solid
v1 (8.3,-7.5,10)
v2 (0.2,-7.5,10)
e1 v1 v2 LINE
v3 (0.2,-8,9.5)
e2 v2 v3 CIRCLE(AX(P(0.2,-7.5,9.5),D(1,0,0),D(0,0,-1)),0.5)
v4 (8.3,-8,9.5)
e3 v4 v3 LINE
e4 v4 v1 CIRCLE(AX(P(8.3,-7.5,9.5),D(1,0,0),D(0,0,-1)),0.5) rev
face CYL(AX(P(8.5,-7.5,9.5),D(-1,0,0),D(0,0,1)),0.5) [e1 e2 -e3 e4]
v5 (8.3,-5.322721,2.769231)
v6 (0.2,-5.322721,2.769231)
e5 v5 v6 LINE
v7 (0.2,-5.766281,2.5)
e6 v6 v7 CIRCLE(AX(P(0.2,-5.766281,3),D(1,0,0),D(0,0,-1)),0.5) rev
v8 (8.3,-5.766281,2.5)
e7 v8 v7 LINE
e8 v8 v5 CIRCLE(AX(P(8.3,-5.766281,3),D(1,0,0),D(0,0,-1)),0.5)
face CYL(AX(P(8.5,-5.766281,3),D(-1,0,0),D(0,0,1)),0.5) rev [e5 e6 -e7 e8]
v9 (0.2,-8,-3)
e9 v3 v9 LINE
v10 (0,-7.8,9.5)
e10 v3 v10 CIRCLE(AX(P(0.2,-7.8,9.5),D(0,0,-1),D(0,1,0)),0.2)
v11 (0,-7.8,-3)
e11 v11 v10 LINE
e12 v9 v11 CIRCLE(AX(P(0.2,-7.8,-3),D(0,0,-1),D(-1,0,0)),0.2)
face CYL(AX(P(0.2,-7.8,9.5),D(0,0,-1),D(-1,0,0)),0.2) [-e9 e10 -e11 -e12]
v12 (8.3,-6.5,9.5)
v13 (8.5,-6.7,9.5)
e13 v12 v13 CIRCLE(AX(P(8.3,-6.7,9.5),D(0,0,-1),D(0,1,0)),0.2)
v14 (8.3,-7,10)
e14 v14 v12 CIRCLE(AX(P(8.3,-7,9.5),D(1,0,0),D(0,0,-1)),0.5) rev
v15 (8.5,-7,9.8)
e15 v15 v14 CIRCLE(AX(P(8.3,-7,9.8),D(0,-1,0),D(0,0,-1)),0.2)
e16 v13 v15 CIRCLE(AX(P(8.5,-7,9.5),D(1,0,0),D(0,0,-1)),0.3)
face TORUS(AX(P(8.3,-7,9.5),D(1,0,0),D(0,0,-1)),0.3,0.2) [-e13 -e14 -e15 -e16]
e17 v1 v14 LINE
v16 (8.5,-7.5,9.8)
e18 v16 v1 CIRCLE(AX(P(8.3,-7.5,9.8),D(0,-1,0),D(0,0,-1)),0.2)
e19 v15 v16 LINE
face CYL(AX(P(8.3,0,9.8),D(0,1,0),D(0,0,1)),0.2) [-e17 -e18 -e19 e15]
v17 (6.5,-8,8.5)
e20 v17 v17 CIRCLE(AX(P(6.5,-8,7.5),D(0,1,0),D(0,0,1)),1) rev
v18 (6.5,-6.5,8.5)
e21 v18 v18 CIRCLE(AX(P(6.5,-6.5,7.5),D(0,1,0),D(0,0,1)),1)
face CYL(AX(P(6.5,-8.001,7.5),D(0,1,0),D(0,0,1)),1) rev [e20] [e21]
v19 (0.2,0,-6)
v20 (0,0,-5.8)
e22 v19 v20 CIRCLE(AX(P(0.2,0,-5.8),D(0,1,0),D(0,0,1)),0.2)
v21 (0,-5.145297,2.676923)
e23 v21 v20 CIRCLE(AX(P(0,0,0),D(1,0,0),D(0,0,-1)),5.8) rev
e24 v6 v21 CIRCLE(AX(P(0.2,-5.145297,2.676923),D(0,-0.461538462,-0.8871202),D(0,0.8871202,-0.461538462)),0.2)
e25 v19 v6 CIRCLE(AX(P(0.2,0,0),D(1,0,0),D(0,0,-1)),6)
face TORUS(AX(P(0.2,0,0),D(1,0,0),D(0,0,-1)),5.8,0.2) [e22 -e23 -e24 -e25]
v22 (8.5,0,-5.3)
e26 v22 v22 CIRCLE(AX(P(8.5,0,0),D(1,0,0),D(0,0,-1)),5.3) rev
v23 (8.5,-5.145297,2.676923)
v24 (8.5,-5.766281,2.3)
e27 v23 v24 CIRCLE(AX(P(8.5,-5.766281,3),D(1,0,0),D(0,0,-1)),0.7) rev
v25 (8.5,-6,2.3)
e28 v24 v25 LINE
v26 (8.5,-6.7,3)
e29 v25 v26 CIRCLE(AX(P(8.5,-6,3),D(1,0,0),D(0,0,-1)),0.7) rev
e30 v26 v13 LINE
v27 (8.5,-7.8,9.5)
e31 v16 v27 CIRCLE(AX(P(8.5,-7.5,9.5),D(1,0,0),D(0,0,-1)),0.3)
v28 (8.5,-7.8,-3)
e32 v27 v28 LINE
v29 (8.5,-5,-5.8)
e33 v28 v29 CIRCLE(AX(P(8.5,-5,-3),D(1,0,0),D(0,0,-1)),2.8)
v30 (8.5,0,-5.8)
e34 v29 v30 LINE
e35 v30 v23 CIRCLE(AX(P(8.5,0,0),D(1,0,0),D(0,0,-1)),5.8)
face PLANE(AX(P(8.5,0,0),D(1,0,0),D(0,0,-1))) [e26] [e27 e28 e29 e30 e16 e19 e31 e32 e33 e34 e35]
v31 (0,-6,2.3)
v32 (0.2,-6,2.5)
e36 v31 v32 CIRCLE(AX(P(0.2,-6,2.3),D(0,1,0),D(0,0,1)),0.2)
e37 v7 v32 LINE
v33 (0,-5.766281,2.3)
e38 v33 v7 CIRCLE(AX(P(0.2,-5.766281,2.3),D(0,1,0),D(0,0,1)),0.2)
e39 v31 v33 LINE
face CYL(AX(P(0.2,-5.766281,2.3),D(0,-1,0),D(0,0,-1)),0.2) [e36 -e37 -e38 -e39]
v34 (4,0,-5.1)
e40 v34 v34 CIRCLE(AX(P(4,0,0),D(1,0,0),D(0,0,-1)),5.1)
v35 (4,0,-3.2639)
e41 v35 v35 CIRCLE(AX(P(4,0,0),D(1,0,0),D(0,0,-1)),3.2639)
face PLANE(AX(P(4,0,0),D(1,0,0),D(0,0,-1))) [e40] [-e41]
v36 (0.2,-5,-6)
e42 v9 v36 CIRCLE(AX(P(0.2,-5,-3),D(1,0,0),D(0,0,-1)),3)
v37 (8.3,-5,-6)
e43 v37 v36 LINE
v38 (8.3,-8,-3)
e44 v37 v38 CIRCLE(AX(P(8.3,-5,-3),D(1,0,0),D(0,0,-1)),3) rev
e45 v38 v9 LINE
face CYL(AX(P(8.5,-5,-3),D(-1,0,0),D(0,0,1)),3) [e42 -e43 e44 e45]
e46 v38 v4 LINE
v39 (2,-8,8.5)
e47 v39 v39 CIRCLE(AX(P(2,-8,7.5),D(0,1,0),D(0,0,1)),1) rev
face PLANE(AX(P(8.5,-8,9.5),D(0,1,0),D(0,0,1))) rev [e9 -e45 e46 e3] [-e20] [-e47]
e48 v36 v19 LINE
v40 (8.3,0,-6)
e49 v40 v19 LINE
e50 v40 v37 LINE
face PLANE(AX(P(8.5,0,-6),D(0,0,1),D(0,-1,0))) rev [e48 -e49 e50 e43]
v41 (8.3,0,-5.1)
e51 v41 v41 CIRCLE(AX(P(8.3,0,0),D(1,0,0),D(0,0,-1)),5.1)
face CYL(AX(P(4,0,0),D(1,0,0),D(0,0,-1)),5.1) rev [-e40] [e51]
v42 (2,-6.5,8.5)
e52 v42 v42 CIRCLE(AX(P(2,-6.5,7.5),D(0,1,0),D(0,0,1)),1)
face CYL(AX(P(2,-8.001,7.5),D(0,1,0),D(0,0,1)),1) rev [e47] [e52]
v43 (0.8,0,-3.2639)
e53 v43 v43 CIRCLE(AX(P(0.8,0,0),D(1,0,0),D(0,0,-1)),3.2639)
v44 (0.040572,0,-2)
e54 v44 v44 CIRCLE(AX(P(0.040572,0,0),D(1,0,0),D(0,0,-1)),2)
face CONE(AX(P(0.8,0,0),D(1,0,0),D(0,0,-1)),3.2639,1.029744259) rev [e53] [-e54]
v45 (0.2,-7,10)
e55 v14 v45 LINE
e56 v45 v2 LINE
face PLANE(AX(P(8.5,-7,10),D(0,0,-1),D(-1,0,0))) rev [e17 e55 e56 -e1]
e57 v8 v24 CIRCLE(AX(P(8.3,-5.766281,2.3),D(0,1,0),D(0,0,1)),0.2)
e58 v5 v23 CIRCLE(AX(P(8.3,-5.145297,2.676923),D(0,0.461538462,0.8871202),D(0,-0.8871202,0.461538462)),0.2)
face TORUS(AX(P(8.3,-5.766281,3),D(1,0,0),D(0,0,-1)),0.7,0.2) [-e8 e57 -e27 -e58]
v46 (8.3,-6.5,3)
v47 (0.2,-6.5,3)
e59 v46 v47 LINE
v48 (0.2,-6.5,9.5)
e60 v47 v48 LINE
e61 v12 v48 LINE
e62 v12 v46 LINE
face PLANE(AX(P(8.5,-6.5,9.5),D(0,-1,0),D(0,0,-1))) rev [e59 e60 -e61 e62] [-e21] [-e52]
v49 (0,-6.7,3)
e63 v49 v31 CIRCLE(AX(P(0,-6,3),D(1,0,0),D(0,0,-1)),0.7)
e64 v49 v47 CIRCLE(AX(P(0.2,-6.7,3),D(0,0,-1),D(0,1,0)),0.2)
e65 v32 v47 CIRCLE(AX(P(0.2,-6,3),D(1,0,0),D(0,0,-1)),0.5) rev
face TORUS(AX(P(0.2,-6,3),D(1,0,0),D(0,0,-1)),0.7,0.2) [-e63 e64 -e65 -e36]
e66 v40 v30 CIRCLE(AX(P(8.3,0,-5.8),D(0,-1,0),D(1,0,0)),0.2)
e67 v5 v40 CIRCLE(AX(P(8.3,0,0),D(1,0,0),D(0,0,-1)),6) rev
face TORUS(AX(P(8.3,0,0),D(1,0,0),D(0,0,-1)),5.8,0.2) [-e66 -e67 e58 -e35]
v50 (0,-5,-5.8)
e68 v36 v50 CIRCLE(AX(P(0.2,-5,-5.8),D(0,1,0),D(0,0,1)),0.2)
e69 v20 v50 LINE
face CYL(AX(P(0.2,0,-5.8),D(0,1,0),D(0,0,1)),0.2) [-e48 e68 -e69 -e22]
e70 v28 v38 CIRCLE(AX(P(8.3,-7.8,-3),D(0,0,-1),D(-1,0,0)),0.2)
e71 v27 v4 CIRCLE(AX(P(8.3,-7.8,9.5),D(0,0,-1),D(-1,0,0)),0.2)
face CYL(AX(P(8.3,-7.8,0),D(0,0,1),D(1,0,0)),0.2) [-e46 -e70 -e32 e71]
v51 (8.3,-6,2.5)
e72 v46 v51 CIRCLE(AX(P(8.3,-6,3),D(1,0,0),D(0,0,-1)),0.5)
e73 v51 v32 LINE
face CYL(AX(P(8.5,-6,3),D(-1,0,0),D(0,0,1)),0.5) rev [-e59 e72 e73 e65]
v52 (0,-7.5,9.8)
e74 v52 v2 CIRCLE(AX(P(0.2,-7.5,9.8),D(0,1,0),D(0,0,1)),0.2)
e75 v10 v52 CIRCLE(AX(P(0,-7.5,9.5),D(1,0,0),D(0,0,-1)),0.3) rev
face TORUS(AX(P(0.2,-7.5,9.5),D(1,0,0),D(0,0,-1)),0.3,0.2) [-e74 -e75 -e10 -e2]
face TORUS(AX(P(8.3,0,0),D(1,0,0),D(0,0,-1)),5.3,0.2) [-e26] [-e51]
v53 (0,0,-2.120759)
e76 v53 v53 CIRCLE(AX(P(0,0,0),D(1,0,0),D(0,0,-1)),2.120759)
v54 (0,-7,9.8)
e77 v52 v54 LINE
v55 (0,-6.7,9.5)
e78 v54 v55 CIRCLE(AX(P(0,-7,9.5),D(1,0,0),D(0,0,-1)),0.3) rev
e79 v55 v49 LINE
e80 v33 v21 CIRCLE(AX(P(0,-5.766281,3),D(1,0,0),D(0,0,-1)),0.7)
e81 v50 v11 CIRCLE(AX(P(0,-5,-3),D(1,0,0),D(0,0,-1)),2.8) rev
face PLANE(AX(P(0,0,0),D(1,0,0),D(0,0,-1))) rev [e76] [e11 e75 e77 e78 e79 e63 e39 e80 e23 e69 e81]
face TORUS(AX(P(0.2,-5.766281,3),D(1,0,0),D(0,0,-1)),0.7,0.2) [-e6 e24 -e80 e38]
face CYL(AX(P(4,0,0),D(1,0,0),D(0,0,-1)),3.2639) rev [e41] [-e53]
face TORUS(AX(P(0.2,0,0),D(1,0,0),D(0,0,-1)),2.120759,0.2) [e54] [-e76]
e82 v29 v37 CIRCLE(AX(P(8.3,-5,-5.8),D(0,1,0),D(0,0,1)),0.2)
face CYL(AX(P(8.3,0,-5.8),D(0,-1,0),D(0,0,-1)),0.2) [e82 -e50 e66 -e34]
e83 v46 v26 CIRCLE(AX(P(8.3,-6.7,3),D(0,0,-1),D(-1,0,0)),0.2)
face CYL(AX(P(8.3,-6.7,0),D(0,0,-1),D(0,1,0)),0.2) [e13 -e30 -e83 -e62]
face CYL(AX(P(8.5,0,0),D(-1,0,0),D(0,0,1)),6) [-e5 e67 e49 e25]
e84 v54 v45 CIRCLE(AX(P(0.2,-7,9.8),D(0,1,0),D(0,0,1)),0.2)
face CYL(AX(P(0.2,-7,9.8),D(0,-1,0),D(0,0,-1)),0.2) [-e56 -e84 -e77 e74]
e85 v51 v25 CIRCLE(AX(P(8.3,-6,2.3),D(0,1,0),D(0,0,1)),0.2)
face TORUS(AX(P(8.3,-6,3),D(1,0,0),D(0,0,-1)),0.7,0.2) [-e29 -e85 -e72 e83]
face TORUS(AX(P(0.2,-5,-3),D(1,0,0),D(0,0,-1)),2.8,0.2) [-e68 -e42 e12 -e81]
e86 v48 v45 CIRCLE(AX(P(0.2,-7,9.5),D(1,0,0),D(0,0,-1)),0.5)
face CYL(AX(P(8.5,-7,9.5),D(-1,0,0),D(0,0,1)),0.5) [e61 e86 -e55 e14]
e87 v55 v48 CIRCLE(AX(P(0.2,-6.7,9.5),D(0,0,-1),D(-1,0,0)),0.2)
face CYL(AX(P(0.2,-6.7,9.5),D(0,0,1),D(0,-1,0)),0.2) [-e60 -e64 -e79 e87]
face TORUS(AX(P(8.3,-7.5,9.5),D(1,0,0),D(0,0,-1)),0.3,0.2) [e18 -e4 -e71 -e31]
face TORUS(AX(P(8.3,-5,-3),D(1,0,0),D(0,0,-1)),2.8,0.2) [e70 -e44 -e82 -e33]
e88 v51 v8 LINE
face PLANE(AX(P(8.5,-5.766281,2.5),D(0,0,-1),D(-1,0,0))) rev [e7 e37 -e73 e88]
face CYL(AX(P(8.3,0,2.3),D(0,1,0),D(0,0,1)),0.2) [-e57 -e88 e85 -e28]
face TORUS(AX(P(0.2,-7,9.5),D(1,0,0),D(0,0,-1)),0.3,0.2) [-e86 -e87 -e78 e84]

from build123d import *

# Parameters (mm, degrees)
EXTRUDE_1_DEPTH             = 8.5
SKETCH_2_R                  = 2
CUT_EXTRUDE_1_DEPTH         = 10
SKETCH_6_R                  = 5.1
CUT_EXTRUDE_3_DEPTH         = 4.5
HOLE_WIZARD_5_16_18_1_D     = 6.5278
HOLE_WIZARD_5_16_18_1_DEPTH = 3.2
HOLE_WIZARD_5_16_18_1_TIP   = 1.961148974
CUT_EXTRUDE_2_REACH         = 20.125
SKETCH_5_R                  = 1
FILLET_1_R                  = 0.2


with BuildPart() as part:
    # 草图1 → 凸台-拉伸1 (new body)
    with BuildSketch(Plane(origin=(0, 0, 0), x_dir=(0, 0, -1), z_dir=(1, 0, 0))):
        with BuildLine():
            Line((-9.5, -6.5), (-3, -6.5))
            ThreePointArc((-3, -6.5), (-2.646446609, -6.353553391), (-2.5, -6))
            Line((-2.5, -6), (-2.5, -5.766281297))
            ThreePointArc((-2.5, -5.766281297), (-2.572574793, -5.506844037), (-2.769230769, -5.322721198))
            ThreePointArc((-2.769230769, -5.322721198), (-3.11324713, 5.129102486), (6, 0))
            Line((6, 0), (6, -5))
            ThreePointArc((6, -5), (5.121320344, -7.121320344), (3, -8))
            Line((3, -8), (-9.5, -8))
            ThreePointArc((-9.5, -8), (-9.853553391, -7.853553391), (-10, -7.5))
            Line((-10, -7.5), (-10, -7))
            ThreePointArc((-10, -7), (-9.853553391, -6.646446609), (-9.5, -6.5))
        make_face()
    extrude(amount=EXTRUDE_1_DEPTH)

    # 草图2 → 切除-拉伸1 (cut)
    with BuildSketch(Plane.ZY):
        Circle(SKETCH_2_R)
    extrude(amount=-CUT_EXTRUDE_1_DEPTH, mode=Mode.SUBTRACT)

    # 草图6 → 切除-拉伸3 (cut)
    with BuildSketch(Plane(origin=(8.5, 0, 0), x_dir=(0, 0, -1), z_dir=(1, 0, 0))):
        Circle(SKETCH_6_R)
    extrude(amount=-CUT_EXTRUDE_3_DEPTH, mode=Mode.SUBTRACT)

    # 5/16-18 螺纹孔1
    with Locations(Plane(origin=(4, 0, 0), x_dir=(0, 0, -1), z_dir=(1, 0, 0))):
        with Locations((0, 0)):
            Hole(HOLE_WIZARD_5_16_18_1_D / 2, depth=HOLE_WIZARD_5_16_18_1_DEPTH)
            with Locations((0, 0, -(HOLE_WIZARD_5_16_18_1_DEPTH + HOLE_WIZARD_5_16_18_1_TIP / 2))):  # 118° drill point
                Cone(0, HOLE_WIZARD_5_16_18_1_D / 2, HOLE_WIZARD_5_16_18_1_TIP, mode=Mode.SUBTRACT)

    # 草图5 → 切除-拉伸2 (cut, up to next)
    with BuildSketch(Plane(origin=(0, -6.5, 0), x_dir=(1, 0, 0), z_dir=(0, 1, 0)), mode=Mode.PRIVATE) as cut_extrude_2_sk1:
        with Locations(Location((2, -7.5, 0), (0, 0, 270))):
            Circle(SKETCH_5_R)
    cut_extrude_2_tool1 = extrude(cut_extrude_2_sk1.sketch, amount=-CUT_EXTRUDE_2_REACH, mode=Mode.PRIVATE) & part.part
    # 草图5 → 切除-拉伸2 (cut, up to next)
    with BuildSketch(Plane(origin=(0, -6.5, 0), x_dir=(1, 0, 0), z_dir=(0, 1, 0)), mode=Mode.PRIVATE) as cut_extrude_2_sk2:
        with Locations(Location((6.5, -7.5, 0), (0, 0, 270))):
            Circle(SKETCH_5_R)
    cut_extrude_2_tool2 = extrude(cut_extrude_2_sk2.sketch, amount=-CUT_EXTRUDE_2_REACH, mode=Mode.PRIVATE) & part.part
    add(cut_extrude_2_tool1.solids().sort_by_distance((2, -6.5, 7.5))[0], mode=Mode.SUBTRACT)
    add(cut_extrude_2_tool2.solids().sort_by_distance((6.5, -6.5, 7.5))[0], mode=Mode.SUBTRACT)

    # 圆角1
    # the kernel refuses this fillet: 0.2 mm, written as the material it takes off along each edge
    with BuildSketch(Plane(origin=(8.5, -6, 2.5), x_dir=(0, 0, -1), z_dir=(0, 1, 0))) as fillet_1_piece_1:
        with BuildLine():
            CenterArc((FILLET_1_R, FILLET_1_R), FILLET_1_R, 180, 90)
            Line((0, FILLET_1_R), (-FILLET_1_R * 0.02, FILLET_1_R))
            Line((-FILLET_1_R * 0.02, FILLET_1_R), (-FILLET_1_R * 0.02, -FILLET_1_R * 0.02))
            Line((-FILLET_1_R * 0.02, -FILLET_1_R * 0.02), (FILLET_1_R, -FILLET_1_R * 0.02))
            Line((FILLET_1_R, -FILLET_1_R * 0.02), (FILLET_1_R, 0))
        make_face()
    extrude(amount=0.233718703, mode=Mode.SUBTRACT)
    with BuildSketch(Plane(origin=(0, 0, -6), x_dir=(0, 0, 1), z_dir=(0, -1, 0))) as fillet_1_piece_2:
        with BuildLine():
            CenterArc((FILLET_1_R, -FILLET_1_R), FILLET_1_R, 90, 90)
            Line((0, -FILLET_1_R), (-FILLET_1_R * 0.02, -FILLET_1_R))
            Line((-FILLET_1_R * 0.02, -FILLET_1_R), (-FILLET_1_R * 0.02, FILLET_1_R * 0.02))
            Line((-FILLET_1_R * 0.02, FILLET_1_R * 0.02), (FILLET_1_R, FILLET_1_R * 0.02))
            Line((FILLET_1_R, FILLET_1_R * 0.02), (FILLET_1_R, 0))
        make_face()
    extrude(amount=5, mode=Mode.SUBTRACT)
    with BuildSketch(Plane(origin=(0, -5, -3), x_dir=(0, 0, -1), z_dir=(0, 1, 0))) as fillet_1_piece_3:
        with BuildLine():
            CenterArc((3 - FILLET_1_R, -FILLET_1_R), FILLET_1_R, 0, 90)
            Line((3 - FILLET_1_R, 0), (3 - FILLET_1_R, FILLET_1_R * 0.02))
            Line((3 - FILLET_1_R, FILLET_1_R * 0.02), (3 + FILLET_1_R * 0.02, FILLET_1_R * 0.02))
            Line((3 + FILLET_1_R * 0.02, FILLET_1_R * 0.02), (3 + FILLET_1_R * 0.02, -FILLET_1_R))
            Line((3 + FILLET_1_R * 0.02, -FILLET_1_R), (3, -FILLET_1_R))
        make_face()
    revolve(axis=Axis((0, -5, -3), (-1, 0, 0)), revolution_arc=90, mode=Mode.SUBTRACT)
    with BuildSketch(Plane(origin=(0, -8, -3), x_dir=(1, 0, 0), z_dir=(0, 0, 1))) as fillet_1_piece_4:
        with BuildLine():
            CenterArc((FILLET_1_R, FILLET_1_R), FILLET_1_R, 180, 90)
            Line((0, FILLET_1_R), (-FILLET_1_R * 0.02, FILLET_1_R))
            Line((-FILLET_1_R * 0.02, FILLET_1_R), (-FILLET_1_R * 0.02, -FILLET_1_R * 0.02))
            Line((-FILLET_1_R * 0.02, -FILLET_1_R * 0.02), (FILLET_1_R, -FILLET_1_R * 0.02))
            Line((FILLET_1_R, -FILLET_1_R * 0.02), (FILLET_1_R, 0))
        make_face()
    extrude(amount=12.5, mode=Mode.SUBTRACT)
    with BuildSketch(Plane(origin=(0, -7.5, 9.5), x_dir=(0, -1, 0), z_dir=(0, 0, -1))) as fillet_1_piece_5:
        with BuildLine():
            CenterArc((0.5 - FILLET_1_R, -FILLET_1_R), FILLET_1_R, 0, 90)
            Line((0.5, -FILLET_1_R), (0.5 + FILLET_1_R * 0.02, -FILLET_1_R))
            Line((0.5 + FILLET_1_R * 0.02, -FILLET_1_R), (0.5 + FILLET_1_R * 0.02, FILLET_1_R * 0.02))
            Line((0.5 + FILLET_1_R * 0.02, FILLET_1_R * 0.02), (0.5 - FILLET_1_R, FILLET_1_R * 0.02))
            Line((0.5 - FILLET_1_R, FILLET_1_R * 0.02), (0.5 - FILLET_1_R, 0))
        make_face()
    revolve(axis=Axis((0, -7.5, 9.5), (-1, 0, 0)), revolution_arc=90, mode=Mode.SUBTRACT)
    with BuildSketch(Plane(origin=(0, -7.5, 10), x_dir=(0, 0, -1), z_dir=(0, 1, 0))) as fillet_1_piece_6:
        with BuildLine():
            CenterArc((FILLET_1_R, -FILLET_1_R), FILLET_1_R, 90, 90)
            Line((0, -FILLET_1_R), (-FILLET_1_R * 0.02, -FILLET_1_R))
            Line((-FILLET_1_R * 0.02, -FILLET_1_R), (-FILLET_1_R * 0.02, FILLET_1_R * 0.02))
            Line((-FILLET_1_R * 0.02, FILLET_1_R * 0.02), (FILLET_1_R, FILLET_1_R * 0.02))
            Line((FILLET_1_R, FILLET_1_R * 0.02), (FILLET_1_R, 0))
        make_face()
    extrude(amount=0.5, mode=Mode.SUBTRACT)
    with BuildSketch(Plane(origin=(0, -7, 9.5), x_dir=(0, 0, 1), z_dir=(0, -1, 0))) as fillet_1_piece_7:
        with BuildLine():
            CenterArc((0.5 - FILLET_1_R, -FILLET_1_R), FILLET_1_R, 0, 90)
            Line((0.5, -FILLET_1_R), (0.5 + FILLET_1_R * 0.02, -FILLET_1_R))
            Line((0.5 + FILLET_1_R * 0.02, -FILLET_1_R), (0.5 + FILLET_1_R * 0.02, FILLET_1_R * 0.02))
            Line((0.5 + FILLET_1_R * 0.02, FILLET_1_R * 0.02), (0.5 - FILLET_1_R, FILLET_1_R * 0.02))
            Line((0.5 - FILLET_1_R, FILLET_1_R * 0.02), (0.5 - FILLET_1_R, 0))
        make_face()
    revolve(axis=Axis((0, -7, 9.5), (-1, 0, 0)), revolution_arc=90, mode=Mode.SUBTRACT)
    with BuildSketch(Plane(origin=(0, -6.5, 9.5), x_dir=(0, -1, 0), z_dir=(0, 0, -1))) as fillet_1_piece_8:
        with BuildLine():
            CenterArc((FILLET_1_R, -FILLET_1_R), FILLET_1_R, 90, 90)
            Line((0, -FILLET_1_R), (-FILLET_1_R * 0.02, -FILLET_1_R))
            Line((-FILLET_1_R * 0.02, -FILLET_1_R), (-FILLET_1_R * 0.02, FILLET_1_R * 0.02))
            Line((-FILLET_1_R * 0.02, FILLET_1_R * 0.02), (FILLET_1_R, FILLET_1_R * 0.02))
            Line((FILLET_1_R, FILLET_1_R * 0.02), (FILLET_1_R, 0))
        make_face()
    extrude(amount=6.5, mode=Mode.SUBTRACT)
    with BuildSketch(Plane(origin=(0, -6, 3), x_dir=(0, -1, 0), z_dir=(0, 0, 1))) as fillet_1_piece_9:
        with BuildLine():
            CenterArc((0.5 + FILLET_1_R, FILLET_1_R), FILLET_1_R, 180, 90)
            Line((0.5, FILLET_1_R), (0.5 - FILLET_1_R * 0.02, FILLET_1_R))
            Line((0.5 - FILLET_1_R * 0.02, FILLET_1_R), (0.5 - FILLET_1_R * 0.02, -FILLET_1_R * 0.02))
            Line((0.5 - FILLET_1_R * 0.02, -FILLET_1_R * 0.02), (0.5 + FILLET_1_R, -FILLET_1_R * 0.02))
            Line((0.5 + FILLET_1_R, -FILLET_1_R * 0.02), (0.5 + FILLET_1_R, 0))
        make_face()
    revolve(axis=Axis((0, -6, 3), (1, 0, 0)), revolution_arc=90, mode=Mode.SUBTRACT)
    with BuildSketch(Plane(origin=(8.5, -6, 3), x_dir=(0, -1, 0), z_dir=(0, 0, 1))) as fillet_1_piece_10:
        with BuildLine():
            CenterArc((0.5 + FILLET_1_R, -FILLET_1_R), FILLET_1_R, 90, 90)
            Line((0.5, -FILLET_1_R), (0.5 - FILLET_1_R * 0.02, -FILLET_1_R))
            Line((0.5 - FILLET_1_R * 0.02, -FILLET_1_R), (0.5 - FILLET_1_R * 0.02, FILLET_1_R * 0.02))
            Line((0.5 - FILLET_1_R * 0.02, FILLET_1_R * 0.02), (0.5 + FILLET_1_R, FILLET_1_R * 0.02))
            Line((0.5 + FILLET_1_R, FILLET_1_R * 0.02), (0.5 + FILLET_1_R, 0))
        make_face()
    revolve(axis=Axis((8.5, -6, 3), (1, 0, 0)), revolution_arc=90, mode=Mode.SUBTRACT)
    with BuildSketch(Plane(origin=(0, -6, 2.5), x_dir=(0, 0, -1), z_dir=(0, 1, 0))) as fillet_1_piece_11:
        with BuildLine():
            CenterArc((FILLET_1_R, -FILLET_1_R), FILLET_1_R, 90, 90)
            Line((0, -FILLET_1_R), (-FILLET_1_R * 0.02, -FILLET_1_R))
            Line((-FILLET_1_R * 0.02, -FILLET_1_R), (-FILLET_1_R * 0.02, FILLET_1_R * 0.02))
            Line((-FILLET_1_R * 0.02, FILLET_1_R * 0.02), (FILLET_1_R, FILLET_1_R * 0.02))
            Line((FILLET_1_R, FILLET_1_R * 0.02), (FILLET_1_R, 0))
        make_face()
    extrude(amount=0.233718703, mode=Mode.SUBTRACT)
    with BuildSketch(Plane(origin=(0, -5.766281297, 3), x_dir=(0, 0, -1), z_dir=(0, -1, 0))) as fillet_1_piece_12:
        with BuildLine():
            CenterArc((0.5 + FILLET_1_R, FILLET_1_R), FILLET_1_R, 180, 90)
            Line((0.5, FILLET_1_R), (0.5 - FILLET_1_R * 0.02, FILLET_1_R))
            Line((0.5 - FILLET_1_R * 0.02, FILLET_1_R), (0.5 - FILLET_1_R * 0.02, -FILLET_1_R * 0.02))
            Line((0.5 - FILLET_1_R * 0.02, -FILLET_1_R * 0.02), (0.5 + FILLET_1_R, -FILLET_1_R * 0.02))
            Line((0.5 + FILLET_1_R, -FILLET_1_R * 0.02), (0.5 + FILLET_1_R, 0))
        make_face()
    revolve(axis=Axis((0, -5.766281297, 3), (1, 0, 0)), revolution_arc=62.51357375, mode=Mode.SUBTRACT)
    with BuildSketch(Plane(origin=(0, 0, 0), x_dir=(0, -0.8871201995900613, 0.46153846153846145), z_dir=(0, -0.46153846153846145, -0.8871201995900613))) as fillet_1_piece_13:
        with BuildLine():
            CenterArc((6 - FILLET_1_R, -FILLET_1_R), FILLET_1_R, 0, 90)
            Line((6, -FILLET_1_R), (6 + FILLET_1_R * 0.02, -FILLET_1_R))
            Line((6 + FILLET_1_R * 0.02, -FILLET_1_R), (6 + FILLET_1_R * 0.02, FILLET_1_R * 0.02))
            Line((6 + FILLET_1_R * 0.02, FILLET_1_R * 0.02), (6 - FILLET_1_R, FILLET_1_R * 0.02))
            Line((6 - FILLET_1_R, FILLET_1_R * 0.02), (6 - FILLET_1_R, 0))
        make_face()
    revolve(axis=Axis((0, 0, 0), (-1, 0, 0)), revolution_arc=242.51357375, mode=Mode.SUBTRACT)
    with BuildSketch(Plane(origin=(8.5, -6.5, 9.5), x_dir=(0, -1, 0), z_dir=(0, 0, -1))) as fillet_1_piece_14:
        with BuildLine():
            CenterArc((FILLET_1_R, FILLET_1_R), FILLET_1_R, 180, 90)
            Line((0, FILLET_1_R), (-FILLET_1_R * 0.02, FILLET_1_R))
            Line((-FILLET_1_R * 0.02, FILLET_1_R), (-FILLET_1_R * 0.02, -FILLET_1_R * 0.02))
            Line((-FILLET_1_R * 0.02, -FILLET_1_R * 0.02), (FILLET_1_R, -FILLET_1_R * 0.02))
            Line((FILLET_1_R, -FILLET_1_R * 0.02), (FILLET_1_R, 0))
        make_face()
    extrude(amount=6.5, mode=Mode.SUBTRACT)
    with BuildSketch(Plane(origin=(8.5, -7, 9.5), x_dir=(0, 0, 1), z_dir=(0, -1, 0))) as fillet_1_piece_15:
        with BuildLine():
            CenterArc((0.5 - FILLET_1_R, FILLET_1_R), FILLET_1_R, 270, 90)
            Line((0.5, FILLET_1_R), (0.5 + FILLET_1_R * 0.02, FILLET_1_R))
            Line((0.5 + FILLET_1_R * 0.02, FILLET_1_R), (0.5 + FILLET_1_R * 0.02, -FILLET_1_R * 0.02))
            Line((0.5 + FILLET_1_R * 0.02, -FILLET_1_R * 0.02), (0.5 - FILLET_1_R, -FILLET_1_R * 0.02))
            Line((0.5 - FILLET_1_R, -FILLET_1_R * 0.02), (0.5 - FILLET_1_R, 0))
        make_face()
    revolve(axis=Axis((8.5, -7, 9.5), (-1, 0, 0)), revolution_arc=90, mode=Mode.SUBTRACT)
    with BuildSketch(Plane(origin=(8.5, -7.5, 10), x_dir=(0, 0, -1), z_dir=(0, 1, 0))) as fillet_1_piece_16:
        with BuildLine():
            CenterArc((FILLET_1_R, FILLET_1_R), FILLET_1_R, 180, 90)
            Line((0, FILLET_1_R), (-FILLET_1_R * 0.02, FILLET_1_R))
            Line((-FILLET_1_R * 0.02, FILLET_1_R), (-FILLET_1_R * 0.02, -FILLET_1_R * 0.02))
            Line((-FILLET_1_R * 0.02, -FILLET_1_R * 0.02), (FILLET_1_R, -FILLET_1_R * 0.02))
            Line((FILLET_1_R, -FILLET_1_R * 0.02), (FILLET_1_R, 0))
        make_face()
    extrude(amount=0.5, mode=Mode.SUBTRACT)
    with BuildSketch(Plane(origin=(8.5, -7.5, 9.5), x_dir=(0, -1, 0), z_dir=(0, 0, -1))) as fillet_1_piece_17:
        with BuildLine():
            CenterArc((0.5 - FILLET_1_R, FILLET_1_R), FILLET_1_R, 270, 90)
            Line((0.5, FILLET_1_R), (0.5 + FILLET_1_R * 0.02, FILLET_1_R))
            Line((0.5 + FILLET_1_R * 0.02, FILLET_1_R), (0.5 + FILLET_1_R * 0.02, -FILLET_1_R * 0.02))
            Line((0.5 + FILLET_1_R * 0.02, -FILLET_1_R * 0.02), (0.5 - FILLET_1_R, -FILLET_1_R * 0.02))
            Line((0.5 - FILLET_1_R, -FILLET_1_R * 0.02), (0.5 - FILLET_1_R, 0))
        make_face()
    revolve(axis=Axis((8.5, -7.5, 9.5), (-1, 0, 0)), revolution_arc=90, mode=Mode.SUBTRACT)
    with BuildSketch(Plane(origin=(8.5, -8, -3), x_dir=(-1, 0, 0), z_dir=(0, 0, 1))) as fillet_1_piece_18:
        with BuildLine():
            CenterArc((FILLET_1_R, -FILLET_1_R), FILLET_1_R, 90, 90)
            Line((0, -FILLET_1_R), (-FILLET_1_R * 0.02, -FILLET_1_R))
            Line((-FILLET_1_R * 0.02, -FILLET_1_R), (-FILLET_1_R * 0.02, FILLET_1_R * 0.02))
            Line((-FILLET_1_R * 0.02, FILLET_1_R * 0.02), (FILLET_1_R, FILLET_1_R * 0.02))
            Line((FILLET_1_R, FILLET_1_R * 0.02), (FILLET_1_R, 0))
        make_face()
    extrude(amount=12.5, mode=Mode.SUBTRACT)
    with BuildSketch(Plane(origin=(8.5, -5, -3), x_dir=(0, 0, -1), z_dir=(0, 1, 0))) as fillet_1_piece_19:
        with BuildLine():
            CenterArc((3 - FILLET_1_R, FILLET_1_R), FILLET_1_R, 270, 90)
            Line((3 - FILLET_1_R, 0), (3 - FILLET_1_R, -FILLET_1_R * 0.02))
            Line((3 - FILLET_1_R, -FILLET_1_R * 0.02), (3 + FILLET_1_R * 0.02, -FILLET_1_R * 0.02))
            Line((3 + FILLET_1_R * 0.02, -FILLET_1_R * 0.02), (3 + FILLET_1_R * 0.02, FILLET_1_R))
            Line((3 + FILLET_1_R * 0.02, FILLET_1_R), (3, FILLET_1_R))
        make_face()
    revolve(axis=Axis((8.5, -5, -3), (-1, 0, 0)), revolution_arc=90, mode=Mode.SUBTRACT)
    with BuildSketch(Plane(origin=(0, 0, 0), x_dir=(0, 0, 1), z_dir=(0, -1, 0))) as fillet_1_piece_20:
        with BuildLine():
            CenterArc((2.120759252, -0.2), FILLET_1_R, 90, 37.142271212)
            Line((2, -0.040572264), (1.997584815, -0.037383709))
            ThreePointArc((1.997584815, -0.037383709), (1.996, -0.020286132), (1.996, 0))
            Line((1.996, 0), (2, 0.004))
            Line((2, 0.004), (2.120759252, 0.004))
            Line((2.120759252, 0.004), (2.120759252, 0))
        make_face()
    revolve(axis=Axis((0, 0, 0), (-1, 0, 0)), mode=Mode.SUBTRACT)
    with BuildSketch(Plane(origin=(8.5, 0, -6), x_dir=(0, 0, 1), z_dir=(0, -1, 0))) as fillet_1_piece_21:
        with BuildLine():
            CenterArc((FILLET_1_R, FILLET_1_R), FILLET_1_R, 180, 90)
            Line((0, FILLET_1_R), (-FILLET_1_R * 0.02, FILLET_1_R))
            Line((-FILLET_1_R * 0.02, FILLET_1_R), (-FILLET_1_R * 0.02, -FILLET_1_R * 0.02))
            Line((-FILLET_1_R * 0.02, -FILLET_1_R * 0.02), (FILLET_1_R, -FILLET_1_R * 0.02))
            Line((FILLET_1_R, -FILLET_1_R * 0.02), (FILLET_1_R, 0))
        make_face()
    extrude(amount=5, mode=Mode.SUBTRACT)
    with BuildSketch(Plane(origin=(8.5, 0, 0), x_dir=(0, 0, -1), z_dir=(0, -1, 0))) as fillet_1_piece_22:
        with BuildLine():
            CenterArc((5.1 + FILLET_1_R, -FILLET_1_R), FILLET_1_R, 90, 90)
            Line((5.1, -FILLET_1_R), (5.1 - FILLET_1_R * 0.02, -FILLET_1_R))
            Line((5.1 - FILLET_1_R * 0.02, -FILLET_1_R), (5.1 - FILLET_1_R * 0.02, FILLET_1_R * 0.02))
            Line((5.1 - FILLET_1_R * 0.02, FILLET_1_R * 0.02), (5.1 + FILLET_1_R, FILLET_1_R * 0.02))
            Line((5.1 + FILLET_1_R, FILLET_1_R * 0.02), (5.1 + FILLET_1_R, 0))
        make_face()
    revolve(axis=Axis((8.5, 0, 0), (1, 0, 0)), mode=Mode.SUBTRACT)
    with BuildSketch(Plane(origin=(8.5, 0, 0), x_dir=(0, -0.8871201995900613, 0.46153846153846145), z_dir=(0, -0.46153846153846145, -0.8871201995900613))) as fillet_1_piece_23:
        with BuildLine():
            CenterArc((6 - FILLET_1_R, FILLET_1_R), FILLET_1_R, 270, 90)
            Line((6, FILLET_1_R), (6 + FILLET_1_R * 0.02, FILLET_1_R))
            Line((6 + FILLET_1_R * 0.02, FILLET_1_R), (6 + FILLET_1_R * 0.02, -FILLET_1_R * 0.02))
            Line((6 + FILLET_1_R * 0.02, -FILLET_1_R * 0.02), (6 - FILLET_1_R, -FILLET_1_R * 0.02))
            Line((6 - FILLET_1_R, -FILLET_1_R * 0.02), (6 - FILLET_1_R, 0))
        make_face()
    revolve(axis=Axis((8.5, 0, 0), (-1, 0, 0)), revolution_arc=242.51357375, mode=Mode.SUBTRACT)
    with BuildSketch(Plane(origin=(8.5, -5.766281297, 3), x_dir=(0, 0, -1), z_dir=(0, -1, 0))) as fillet_1_piece_24:
        with BuildLine():
            CenterArc((0.5 + FILLET_1_R, -FILLET_1_R), FILLET_1_R, 90, 90)
            Line((0.5, -FILLET_1_R), (0.5 - FILLET_1_R * 0.02, -FILLET_1_R))
            Line((0.5 - FILLET_1_R * 0.02, -FILLET_1_R), (0.5 - FILLET_1_R * 0.02, FILLET_1_R * 0.02))
            Line((0.5 - FILLET_1_R * 0.02, FILLET_1_R * 0.02), (0.5 + FILLET_1_R, FILLET_1_R * 0.02))
            Line((0.5 + FILLET_1_R, FILLET_1_R * 0.02), (0.5 + FILLET_1_R, 0))
        make_face()
    revolve(axis=Axis((8.5, -5.766281297, 3), (1, 0, 0)), revolution_arc=62.51357375, mode=Mode.SUBTRACT)


solid = part.part
